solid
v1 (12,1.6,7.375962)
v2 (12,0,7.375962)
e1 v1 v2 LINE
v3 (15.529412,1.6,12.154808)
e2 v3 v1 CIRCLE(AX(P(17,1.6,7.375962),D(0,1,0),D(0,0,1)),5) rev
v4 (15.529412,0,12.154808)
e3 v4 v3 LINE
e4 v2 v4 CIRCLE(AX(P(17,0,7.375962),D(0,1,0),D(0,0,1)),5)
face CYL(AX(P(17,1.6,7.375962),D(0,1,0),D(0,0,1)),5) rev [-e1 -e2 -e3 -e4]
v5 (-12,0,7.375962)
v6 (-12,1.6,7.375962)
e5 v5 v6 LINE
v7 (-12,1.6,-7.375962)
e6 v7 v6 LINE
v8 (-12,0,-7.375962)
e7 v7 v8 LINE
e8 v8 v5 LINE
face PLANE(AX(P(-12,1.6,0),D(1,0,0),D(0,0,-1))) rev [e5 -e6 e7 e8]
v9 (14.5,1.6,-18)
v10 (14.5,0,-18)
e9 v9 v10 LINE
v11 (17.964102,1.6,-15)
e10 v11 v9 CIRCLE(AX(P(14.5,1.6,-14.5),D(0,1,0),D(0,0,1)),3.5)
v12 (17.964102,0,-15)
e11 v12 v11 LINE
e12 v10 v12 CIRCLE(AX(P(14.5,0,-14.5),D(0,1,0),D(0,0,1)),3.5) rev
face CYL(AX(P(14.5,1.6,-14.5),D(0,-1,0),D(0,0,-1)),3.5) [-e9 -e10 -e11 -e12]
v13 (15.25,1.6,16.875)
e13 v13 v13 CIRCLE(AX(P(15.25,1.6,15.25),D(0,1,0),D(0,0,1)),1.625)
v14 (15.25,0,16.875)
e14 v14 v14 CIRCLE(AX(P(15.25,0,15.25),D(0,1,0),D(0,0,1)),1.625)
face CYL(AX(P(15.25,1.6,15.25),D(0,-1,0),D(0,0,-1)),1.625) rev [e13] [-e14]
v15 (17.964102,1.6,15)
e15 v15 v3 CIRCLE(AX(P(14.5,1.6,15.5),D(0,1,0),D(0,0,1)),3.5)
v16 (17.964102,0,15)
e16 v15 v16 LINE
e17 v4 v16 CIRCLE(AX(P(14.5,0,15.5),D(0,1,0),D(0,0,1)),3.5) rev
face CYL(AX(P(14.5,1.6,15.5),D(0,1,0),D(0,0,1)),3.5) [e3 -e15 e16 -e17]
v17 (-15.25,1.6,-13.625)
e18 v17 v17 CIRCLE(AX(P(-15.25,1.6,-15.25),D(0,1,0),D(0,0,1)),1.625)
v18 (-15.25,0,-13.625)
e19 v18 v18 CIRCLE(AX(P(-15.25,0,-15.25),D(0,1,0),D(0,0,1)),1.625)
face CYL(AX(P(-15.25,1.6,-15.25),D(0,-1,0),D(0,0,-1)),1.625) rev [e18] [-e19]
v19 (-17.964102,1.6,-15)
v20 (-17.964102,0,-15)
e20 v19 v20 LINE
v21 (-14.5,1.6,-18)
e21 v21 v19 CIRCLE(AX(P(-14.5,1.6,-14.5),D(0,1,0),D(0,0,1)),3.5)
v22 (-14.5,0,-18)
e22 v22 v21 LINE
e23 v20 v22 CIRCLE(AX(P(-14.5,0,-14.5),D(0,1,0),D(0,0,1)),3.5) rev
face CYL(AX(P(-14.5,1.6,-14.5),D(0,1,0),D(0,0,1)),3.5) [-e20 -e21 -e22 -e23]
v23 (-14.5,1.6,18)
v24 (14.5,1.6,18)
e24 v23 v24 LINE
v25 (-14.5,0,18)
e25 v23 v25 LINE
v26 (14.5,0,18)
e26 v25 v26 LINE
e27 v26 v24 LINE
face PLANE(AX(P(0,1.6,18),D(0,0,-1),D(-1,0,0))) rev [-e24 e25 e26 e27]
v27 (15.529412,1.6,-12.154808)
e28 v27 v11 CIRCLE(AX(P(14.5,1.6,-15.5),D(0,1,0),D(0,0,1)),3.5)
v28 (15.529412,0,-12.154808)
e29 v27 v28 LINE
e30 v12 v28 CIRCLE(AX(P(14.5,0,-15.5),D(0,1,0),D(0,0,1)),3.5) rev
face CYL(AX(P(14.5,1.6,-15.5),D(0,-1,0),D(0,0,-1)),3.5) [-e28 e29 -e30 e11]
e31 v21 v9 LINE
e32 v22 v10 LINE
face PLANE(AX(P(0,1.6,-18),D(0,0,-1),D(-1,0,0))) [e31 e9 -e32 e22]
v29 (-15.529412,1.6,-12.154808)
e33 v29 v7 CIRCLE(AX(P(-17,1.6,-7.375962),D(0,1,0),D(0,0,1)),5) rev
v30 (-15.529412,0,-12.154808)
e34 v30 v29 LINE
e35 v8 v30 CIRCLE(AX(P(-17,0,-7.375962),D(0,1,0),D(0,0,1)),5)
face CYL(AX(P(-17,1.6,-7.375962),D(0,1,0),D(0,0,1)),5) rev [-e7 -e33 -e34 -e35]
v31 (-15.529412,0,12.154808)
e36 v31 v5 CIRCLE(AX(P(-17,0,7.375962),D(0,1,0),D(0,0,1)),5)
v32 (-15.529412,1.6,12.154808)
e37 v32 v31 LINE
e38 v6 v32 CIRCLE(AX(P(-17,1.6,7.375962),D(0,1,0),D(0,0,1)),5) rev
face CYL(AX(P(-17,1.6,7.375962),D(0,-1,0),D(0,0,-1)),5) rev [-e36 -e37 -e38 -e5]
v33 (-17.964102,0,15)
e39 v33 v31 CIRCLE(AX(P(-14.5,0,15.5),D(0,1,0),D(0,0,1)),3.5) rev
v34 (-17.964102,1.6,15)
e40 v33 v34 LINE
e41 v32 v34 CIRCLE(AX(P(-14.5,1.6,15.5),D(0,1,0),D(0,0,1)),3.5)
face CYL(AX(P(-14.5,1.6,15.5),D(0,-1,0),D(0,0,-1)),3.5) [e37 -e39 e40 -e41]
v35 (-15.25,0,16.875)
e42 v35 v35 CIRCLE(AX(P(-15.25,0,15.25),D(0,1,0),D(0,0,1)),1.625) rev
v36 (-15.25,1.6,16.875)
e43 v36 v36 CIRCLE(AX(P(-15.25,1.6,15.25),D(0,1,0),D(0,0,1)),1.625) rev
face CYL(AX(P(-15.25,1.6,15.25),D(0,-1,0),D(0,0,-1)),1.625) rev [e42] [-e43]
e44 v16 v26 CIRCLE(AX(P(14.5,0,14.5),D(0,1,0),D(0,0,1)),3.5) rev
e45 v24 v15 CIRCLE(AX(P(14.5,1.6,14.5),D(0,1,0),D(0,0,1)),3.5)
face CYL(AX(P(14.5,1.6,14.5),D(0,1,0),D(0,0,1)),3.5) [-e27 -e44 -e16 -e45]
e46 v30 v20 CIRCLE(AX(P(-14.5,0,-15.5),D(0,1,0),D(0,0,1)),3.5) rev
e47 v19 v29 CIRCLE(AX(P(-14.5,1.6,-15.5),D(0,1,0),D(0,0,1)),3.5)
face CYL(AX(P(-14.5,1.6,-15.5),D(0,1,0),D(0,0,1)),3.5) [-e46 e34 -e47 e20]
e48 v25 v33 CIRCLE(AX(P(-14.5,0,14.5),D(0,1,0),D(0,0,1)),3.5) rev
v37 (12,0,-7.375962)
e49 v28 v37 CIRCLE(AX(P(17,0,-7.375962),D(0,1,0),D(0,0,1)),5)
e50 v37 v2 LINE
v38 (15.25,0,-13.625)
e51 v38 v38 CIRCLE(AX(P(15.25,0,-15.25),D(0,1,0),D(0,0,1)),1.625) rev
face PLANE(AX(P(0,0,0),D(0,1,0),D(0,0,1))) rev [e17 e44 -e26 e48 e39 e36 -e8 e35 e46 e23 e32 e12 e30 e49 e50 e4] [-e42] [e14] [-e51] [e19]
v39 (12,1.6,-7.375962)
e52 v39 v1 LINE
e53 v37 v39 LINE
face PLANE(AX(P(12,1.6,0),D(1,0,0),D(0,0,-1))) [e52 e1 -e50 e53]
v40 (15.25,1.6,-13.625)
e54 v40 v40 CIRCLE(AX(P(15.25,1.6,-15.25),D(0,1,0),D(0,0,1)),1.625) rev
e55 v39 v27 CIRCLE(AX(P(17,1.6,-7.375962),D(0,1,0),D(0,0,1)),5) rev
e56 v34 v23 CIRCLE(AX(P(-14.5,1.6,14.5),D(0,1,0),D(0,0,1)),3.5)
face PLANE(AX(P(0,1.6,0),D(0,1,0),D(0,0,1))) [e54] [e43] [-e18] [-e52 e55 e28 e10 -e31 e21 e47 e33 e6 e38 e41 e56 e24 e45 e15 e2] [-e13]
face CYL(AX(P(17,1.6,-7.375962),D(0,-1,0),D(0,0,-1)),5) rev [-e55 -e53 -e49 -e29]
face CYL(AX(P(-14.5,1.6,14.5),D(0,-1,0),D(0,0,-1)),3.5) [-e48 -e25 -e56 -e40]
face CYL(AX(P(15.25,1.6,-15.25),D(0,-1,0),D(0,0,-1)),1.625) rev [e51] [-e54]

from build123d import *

# Parameters (mm, degrees)
SKETCH1_W           = 24
SKETCH1_H           = 6
SKETCH1_H_2         = 24
SKETCH1_W_2         = 6
SKETCH1_R           = 1.625
BOSS_EXTRUDE1_DEPTH = 1.6
FILLET1_R           = 3.5
FILLET2_R           = 5


with BuildPart() as part:
    # Sketch1 → Boss-Extrude1 (new body)
    # profile 1 of 7: a face of its own
    with BuildSketch(Plane(origin=(0, 0, 0), x_dir=(1, 0, 0), z_dir=(0, 1, 0))):
        with Locations((0, 15)):
            Rectangle(SKETCH1_W, SKETCH1_H)
    # profile 2 of 7: a face of its own
    with BuildSketch(Plane(origin=(0, 0, 0), x_dir=(1, 0, 0), z_dir=(0, 1, 0))):
        Rectangle(SKETCH1_W, SKETCH1_H_2)
    # profile 3 of 7: a face of its own
    with BuildSketch(Plane(origin=(0, 0, 0), x_dir=(1, 0, 0), z_dir=(0, 1, 0))):
        with Locations((15, -15)):
            Rectangle(SKETCH1_W_2, SKETCH1_H)
        with Locations(Location((15.25, -15.25, 0), (0, 0, 270))):
            Circle(SKETCH1_R, mode=Mode.SUBTRACT)
    # profile 4 of 7: a face of its own
    with BuildSketch(Plane(origin=(0, 0, 0), x_dir=(1, 0, 0), z_dir=(0, 1, 0))):
        with Locations((0, -15)):
            Rectangle(SKETCH1_W, SKETCH1_H)
    # profile 5 of 7: a face of its own
    with BuildSketch(Plane(origin=(0, 0, 0), x_dir=(1, 0, 0), z_dir=(0, 1, 0))):
        with Locations((-15, -15)):
            Rectangle(SKETCH1_W_2, SKETCH1_H)
        with Locations(Location((-15.25, -15.25, 0), (0, 0, 270))):
            Circle(SKETCH1_R, mode=Mode.SUBTRACT)
    # profile 6 of 7: a face of its own
    with BuildSketch(Plane(origin=(0, 0, 0), x_dir=(1, 0, 0), z_dir=(0, 1, 0))):
        with Locations((15, 15)):
            Rectangle(SKETCH1_W_2, SKETCH1_H)
        with Locations(Location((15.25, 15.25, 0), (0, 0, 270))):
            Circle(SKETCH1_R, mode=Mode.SUBTRACT)
    # profile 7 of 7: a face of its own
    with BuildSketch(Plane(origin=(0, 0, 0), x_dir=(1, 0, 0), z_dir=(0, 1, 0))):
        with Locations((-15, 15)):
            Rectangle(SKETCH1_W_2, SKETCH1_H)
        with Locations(Location((-15.25, 15.25, 0), (0, 0, 270))):
            Circle(SKETCH1_R, mode=Mode.SUBTRACT)
    extrude(amount=BOSS_EXTRUDE1_DEPTH)

    # Fillet1
    # the kernel refuses this fillet: 3.5 mm, written as the material it takes off along each edge
    with BuildSketch(Plane(origin=(-18, -8.75, 12), x_dir=(1, 0, 0), z_dir=(0, 1, 0)), Plane(origin=(-18, -8.75, -12), x_dir=(0, 0, -1), z_dir=(0, 1, 0)), Plane(origin=(18, -8.75, -12), x_dir=(-1, 0, 0), z_dir=(0, 1, 0)), Plane(origin=(18, -8.75, 12), x_dir=(0, 0, 1), z_dir=(0, 1, 0)), Plane(origin=(18, -8.75, 18), x_dir=(-1, 0, 0), z_dir=(0, 1, 0)), Plane(origin=(-18, -8.75, 18), x_dir=(0, 0, -1), z_dir=(0, 1, 0)), Plane(origin=(-18, -8.75, -18), x_dir=(1, 0, 0), z_dir=(0, 1, 0))) as fillet1_piece_1:
        with BuildLine():
            CenterArc((FILLET1_R, -FILLET1_R), FILLET1_R, 90, 90)
            Line((0, -FILLET1_R), (0, 0))
            Line((0, 0), (FILLET1_R, 0))
        make_face()
    extrude(amount=19.1, mode=Mode.SUBTRACT)
    with BuildSketch(Plane(origin=(18, -8.75, -18), x_dir=(-1, 0, 0), z_dir=(0, 1, 0))) as fillet1_piece_2:
        with BuildLine():
            CenterArc((FILLET1_R, FILLET1_R), FILLET1_R, 180, 90)
            Line((0, FILLET1_R), (0, 0))
            Line((0, 0), (FILLET1_R, 0))
        make_face()
    extrude(amount=19.1, mode=Mode.SUBTRACT)

    # Fillet2
    fillet2_edges = [part.edges().sort_by_distance(p)[0] for p in [
        (12, 0.8, -12),
        (12, 0.8, 12),
        (-12, 0.8, 12),
        (-12, 0.8, -12),
    ]]
    fillet(fillet2_edges, radius=FILLET2_R)


solid = part.part
